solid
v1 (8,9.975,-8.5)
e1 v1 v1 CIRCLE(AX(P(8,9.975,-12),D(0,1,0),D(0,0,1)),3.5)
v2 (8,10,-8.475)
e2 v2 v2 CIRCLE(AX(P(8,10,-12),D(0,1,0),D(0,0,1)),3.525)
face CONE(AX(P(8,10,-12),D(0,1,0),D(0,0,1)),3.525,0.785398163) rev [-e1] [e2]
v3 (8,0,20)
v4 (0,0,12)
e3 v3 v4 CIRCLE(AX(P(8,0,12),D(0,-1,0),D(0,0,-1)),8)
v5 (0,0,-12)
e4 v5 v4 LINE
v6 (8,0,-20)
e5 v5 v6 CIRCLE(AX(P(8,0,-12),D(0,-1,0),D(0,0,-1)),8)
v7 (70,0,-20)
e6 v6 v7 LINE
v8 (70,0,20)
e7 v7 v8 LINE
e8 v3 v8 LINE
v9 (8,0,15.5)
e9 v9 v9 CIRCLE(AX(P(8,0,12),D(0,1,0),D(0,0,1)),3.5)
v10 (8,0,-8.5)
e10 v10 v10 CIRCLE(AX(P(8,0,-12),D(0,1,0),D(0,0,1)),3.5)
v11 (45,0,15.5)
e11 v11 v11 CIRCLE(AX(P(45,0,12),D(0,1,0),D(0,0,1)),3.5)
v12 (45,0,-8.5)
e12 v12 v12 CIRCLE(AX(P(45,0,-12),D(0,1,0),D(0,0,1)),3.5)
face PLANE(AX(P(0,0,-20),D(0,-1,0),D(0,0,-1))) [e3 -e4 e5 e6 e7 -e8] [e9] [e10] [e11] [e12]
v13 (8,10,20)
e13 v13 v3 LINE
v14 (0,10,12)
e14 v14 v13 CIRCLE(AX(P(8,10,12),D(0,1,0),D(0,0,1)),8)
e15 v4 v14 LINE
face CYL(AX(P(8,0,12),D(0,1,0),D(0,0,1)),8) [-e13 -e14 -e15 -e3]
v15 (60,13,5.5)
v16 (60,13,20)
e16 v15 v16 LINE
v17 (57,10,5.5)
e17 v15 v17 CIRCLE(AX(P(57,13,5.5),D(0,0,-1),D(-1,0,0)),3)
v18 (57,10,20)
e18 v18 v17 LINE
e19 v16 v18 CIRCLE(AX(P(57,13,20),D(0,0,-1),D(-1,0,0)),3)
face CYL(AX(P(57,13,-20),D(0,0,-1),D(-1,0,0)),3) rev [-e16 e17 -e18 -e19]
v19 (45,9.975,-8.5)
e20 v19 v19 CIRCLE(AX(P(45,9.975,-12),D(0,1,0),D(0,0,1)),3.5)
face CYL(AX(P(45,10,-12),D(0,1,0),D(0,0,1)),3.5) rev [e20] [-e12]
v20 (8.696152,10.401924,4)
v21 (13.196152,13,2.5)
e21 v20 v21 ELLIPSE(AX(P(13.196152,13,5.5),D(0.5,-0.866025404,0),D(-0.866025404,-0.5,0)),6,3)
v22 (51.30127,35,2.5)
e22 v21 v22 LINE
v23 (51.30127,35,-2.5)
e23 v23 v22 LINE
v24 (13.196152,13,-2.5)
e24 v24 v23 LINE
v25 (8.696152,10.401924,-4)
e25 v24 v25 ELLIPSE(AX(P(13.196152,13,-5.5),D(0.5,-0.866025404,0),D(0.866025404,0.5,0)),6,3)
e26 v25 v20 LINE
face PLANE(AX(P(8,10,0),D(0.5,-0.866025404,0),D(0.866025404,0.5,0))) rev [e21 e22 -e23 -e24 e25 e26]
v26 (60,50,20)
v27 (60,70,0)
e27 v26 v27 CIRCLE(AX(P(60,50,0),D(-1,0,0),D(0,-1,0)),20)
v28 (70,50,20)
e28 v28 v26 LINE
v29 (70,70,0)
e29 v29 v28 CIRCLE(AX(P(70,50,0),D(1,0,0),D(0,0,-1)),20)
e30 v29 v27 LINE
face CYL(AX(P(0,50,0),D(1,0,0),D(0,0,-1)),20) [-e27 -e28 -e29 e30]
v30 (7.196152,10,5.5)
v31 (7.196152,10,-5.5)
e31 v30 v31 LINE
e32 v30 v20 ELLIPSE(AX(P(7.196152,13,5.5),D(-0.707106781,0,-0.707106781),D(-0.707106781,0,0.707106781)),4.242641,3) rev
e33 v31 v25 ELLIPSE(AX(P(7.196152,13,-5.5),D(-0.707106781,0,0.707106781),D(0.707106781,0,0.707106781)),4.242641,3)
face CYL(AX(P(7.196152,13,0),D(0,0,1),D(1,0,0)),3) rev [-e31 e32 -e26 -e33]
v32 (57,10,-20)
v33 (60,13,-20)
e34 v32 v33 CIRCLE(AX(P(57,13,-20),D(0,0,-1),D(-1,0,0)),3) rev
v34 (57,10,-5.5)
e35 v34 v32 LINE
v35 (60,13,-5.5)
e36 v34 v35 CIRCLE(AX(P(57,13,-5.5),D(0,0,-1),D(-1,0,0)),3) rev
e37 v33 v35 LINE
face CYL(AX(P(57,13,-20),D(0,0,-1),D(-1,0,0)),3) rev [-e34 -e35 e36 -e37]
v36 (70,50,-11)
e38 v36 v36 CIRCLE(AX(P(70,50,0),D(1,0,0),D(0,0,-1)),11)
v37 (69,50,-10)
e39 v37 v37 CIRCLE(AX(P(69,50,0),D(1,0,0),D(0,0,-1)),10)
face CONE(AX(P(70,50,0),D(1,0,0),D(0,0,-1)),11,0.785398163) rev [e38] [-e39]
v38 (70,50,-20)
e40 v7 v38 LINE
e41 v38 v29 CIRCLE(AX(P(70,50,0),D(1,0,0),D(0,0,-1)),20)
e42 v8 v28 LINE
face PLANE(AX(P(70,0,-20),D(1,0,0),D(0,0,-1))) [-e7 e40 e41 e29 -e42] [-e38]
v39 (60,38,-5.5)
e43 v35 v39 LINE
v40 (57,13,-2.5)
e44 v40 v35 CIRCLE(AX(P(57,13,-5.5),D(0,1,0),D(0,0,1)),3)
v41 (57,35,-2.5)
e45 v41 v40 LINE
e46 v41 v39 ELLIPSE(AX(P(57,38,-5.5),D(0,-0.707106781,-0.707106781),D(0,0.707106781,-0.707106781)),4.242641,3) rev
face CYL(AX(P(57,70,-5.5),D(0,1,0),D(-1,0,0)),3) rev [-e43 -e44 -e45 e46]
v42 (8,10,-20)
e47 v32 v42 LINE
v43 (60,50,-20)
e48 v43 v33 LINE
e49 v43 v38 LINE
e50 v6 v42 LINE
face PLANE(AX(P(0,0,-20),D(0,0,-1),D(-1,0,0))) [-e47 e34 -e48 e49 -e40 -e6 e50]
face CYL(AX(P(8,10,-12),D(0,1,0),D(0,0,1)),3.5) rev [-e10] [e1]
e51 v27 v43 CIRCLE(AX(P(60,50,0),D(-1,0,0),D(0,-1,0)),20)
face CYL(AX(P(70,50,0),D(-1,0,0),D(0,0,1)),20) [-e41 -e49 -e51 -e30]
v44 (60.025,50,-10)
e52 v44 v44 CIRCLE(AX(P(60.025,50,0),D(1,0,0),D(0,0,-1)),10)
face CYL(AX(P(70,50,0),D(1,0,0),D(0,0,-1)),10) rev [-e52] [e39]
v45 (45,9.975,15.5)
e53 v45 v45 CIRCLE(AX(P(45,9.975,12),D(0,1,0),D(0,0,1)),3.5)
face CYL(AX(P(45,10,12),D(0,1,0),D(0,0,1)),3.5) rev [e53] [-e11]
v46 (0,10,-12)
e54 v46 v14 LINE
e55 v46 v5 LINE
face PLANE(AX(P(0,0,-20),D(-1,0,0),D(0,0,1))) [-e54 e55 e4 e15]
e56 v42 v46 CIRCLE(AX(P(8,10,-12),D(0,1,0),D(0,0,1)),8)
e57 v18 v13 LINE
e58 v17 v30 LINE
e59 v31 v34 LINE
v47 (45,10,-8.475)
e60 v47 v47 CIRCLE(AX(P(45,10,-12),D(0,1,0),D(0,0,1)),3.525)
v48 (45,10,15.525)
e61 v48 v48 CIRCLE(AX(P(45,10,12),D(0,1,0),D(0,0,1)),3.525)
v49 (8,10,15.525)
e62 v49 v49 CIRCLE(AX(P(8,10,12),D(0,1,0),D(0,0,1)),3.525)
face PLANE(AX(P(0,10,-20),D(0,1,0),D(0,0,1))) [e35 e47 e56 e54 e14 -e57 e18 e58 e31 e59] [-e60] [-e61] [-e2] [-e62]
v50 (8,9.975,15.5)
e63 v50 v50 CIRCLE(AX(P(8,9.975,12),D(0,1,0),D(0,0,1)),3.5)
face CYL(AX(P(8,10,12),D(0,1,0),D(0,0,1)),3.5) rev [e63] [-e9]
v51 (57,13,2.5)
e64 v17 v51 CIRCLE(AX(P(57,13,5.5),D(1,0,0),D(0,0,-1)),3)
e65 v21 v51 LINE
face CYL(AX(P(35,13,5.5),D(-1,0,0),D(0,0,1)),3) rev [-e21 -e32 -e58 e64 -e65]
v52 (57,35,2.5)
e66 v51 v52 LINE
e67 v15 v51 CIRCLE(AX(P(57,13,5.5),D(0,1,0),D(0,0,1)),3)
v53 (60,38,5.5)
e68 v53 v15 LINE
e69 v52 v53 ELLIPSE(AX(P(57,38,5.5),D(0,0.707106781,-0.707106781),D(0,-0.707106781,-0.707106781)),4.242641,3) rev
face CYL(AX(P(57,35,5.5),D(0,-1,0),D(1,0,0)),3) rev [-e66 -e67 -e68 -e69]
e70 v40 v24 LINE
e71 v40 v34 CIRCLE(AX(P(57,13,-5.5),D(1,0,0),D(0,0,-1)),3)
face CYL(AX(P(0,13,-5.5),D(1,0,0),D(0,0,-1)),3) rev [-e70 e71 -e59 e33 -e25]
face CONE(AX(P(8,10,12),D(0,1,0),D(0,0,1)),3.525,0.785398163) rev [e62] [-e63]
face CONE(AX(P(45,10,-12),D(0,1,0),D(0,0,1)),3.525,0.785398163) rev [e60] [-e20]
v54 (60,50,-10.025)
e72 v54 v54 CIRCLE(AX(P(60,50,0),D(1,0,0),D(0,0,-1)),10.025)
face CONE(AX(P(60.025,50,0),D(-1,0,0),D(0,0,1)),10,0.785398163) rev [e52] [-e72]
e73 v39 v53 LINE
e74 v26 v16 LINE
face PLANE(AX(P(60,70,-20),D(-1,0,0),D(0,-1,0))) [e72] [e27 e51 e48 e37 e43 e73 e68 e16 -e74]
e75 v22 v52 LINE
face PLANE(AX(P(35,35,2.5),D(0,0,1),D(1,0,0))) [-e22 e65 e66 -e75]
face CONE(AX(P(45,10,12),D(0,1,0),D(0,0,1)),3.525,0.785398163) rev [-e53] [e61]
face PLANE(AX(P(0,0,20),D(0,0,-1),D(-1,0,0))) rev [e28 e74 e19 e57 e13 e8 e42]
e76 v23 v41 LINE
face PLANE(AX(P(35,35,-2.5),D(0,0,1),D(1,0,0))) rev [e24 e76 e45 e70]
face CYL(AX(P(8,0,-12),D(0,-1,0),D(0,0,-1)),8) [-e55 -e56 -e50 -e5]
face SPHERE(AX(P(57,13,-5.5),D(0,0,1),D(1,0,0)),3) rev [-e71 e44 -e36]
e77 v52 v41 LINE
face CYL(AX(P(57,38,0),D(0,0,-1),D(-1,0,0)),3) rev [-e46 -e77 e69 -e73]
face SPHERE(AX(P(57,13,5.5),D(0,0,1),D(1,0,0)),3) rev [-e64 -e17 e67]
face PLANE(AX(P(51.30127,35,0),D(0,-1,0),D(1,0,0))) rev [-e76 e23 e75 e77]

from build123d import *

# Parameters (mm, degrees)
RESSALTO_EXTRUS_O1_DEPTH             = 20
FILETE1_R                            = 8
FILETE2_R                            = 20
FILETE3_R                            = 3
NERVURA23_START                      = -2.5
NERVURA23_DEPTH                      = 5
FILETE4_R                            = 3
FURO_DE_DI_METRO_7_0_7_1_D           = 7
FURO_DE_DI_METRO_7_0_7_1_CSINK_D     = 7.05
FURO_DE_DI_METRO_7_0_7_1_CSINK_ANGLE = 90


# Read off the part's stored shape, not the designer's step: Nervura23
with BuildPart() as part:
    # Esboço1 → Ressalto-extrusão1 (new, symmetric)
    with BuildSketch(Plane.XY):
        Polygon((0, 0), (70, 0), (70, 70), (60, 70), (60, 10), (0, 10), align=None)
    extrude(amount=RESSALTO_EXTRUS_O1_DEPTH, both=True)

    # Filete1
    filete1_edges = [part.edges().sort_by_distance(p)[0] for p in [
        (0, 5, -20),
        (0, 5, 20),
    ]]
    fillet(filete1_edges, radius=FILETE1_R)

    # Filete2
    filete2_edges = [part.edges().sort_by_distance(p)[0] for p in [
        (65, 70, 20),
        (65, 70, -20),
    ]]
    fillet(filete2_edges, radius=FILETE2_R - 0.0001)  # a hair under: the kernel refuses the full size

    # Filete3
    filete3_edges = [part.edges().sort_by_distance(p)[0] for p in [
        (60, 10, 0),
    ]]
    fillet(filete3_edges, radius=FILETE3_R)

    # Nervura23 outline → Nervura23 (add)
    with BuildSketch(Plane.XY.offset(NERVURA23_START)):
        with BuildLine():
            Line((60, 35), (51.301270189, 35))
            Line((51.301270189, 35), (8, 10))
            Line((8, 10), (57, 10))
            ThreePointArc((57, 10), (59.121320344, 10.878679656), (60, 13))
            Line((60, 13), (60, 35))
        make_face()
    extrude(amount=NERVURA23_DEPTH)

    # Filete4
    filete4_edges = [part.edges().sort_by_distance(p)[0] for p in [
        (59.121320344, 10.878679656, -2.5),
        (59.121320344, 10.878679656, 2.5),
        (8, 10, 0),
        (60, 35, 0),
        (32.5, 10, -2.5),
        (60, 24, -2.5),
        (32.5, 10, 2.5),
        (60, 24, 2.5),
    ]]
    fillet(filete4_edges, radius=FILETE4_R)

    # Furo de diâmetro Ø7.0 (7)1 (through all)
    with Locations(Plane(origin=(0, 10, 0), x_dir=(1, 0, 0), z_dir=(0, 1, 0))):
        with Locations((8, 12), (8, -12), (45, 12), (45, -12)):
            CounterSinkHole(FURO_DE_DI_METRO_7_0_7_1_D / 2, FURO_DE_DI_METRO_7_0_7_1_CSINK_D / 2, counter_sink_angle=FURO_DE_DI_METRO_7_0_7_1_CSINK_ANGLE)

    # Esboço11 → Furo de diâmetro Ø20.0 (20)1 (revolve, cut)
    with BuildSketch(Plane(origin=(70, 50, 0), x_dir=(0, 0, -1), z_dir=(0, 1, 0))):
        Polygon((0, 0), (0, 10), (10.025, 10), (10, 9.975), (10, 1), (11, 0), align=None)
    revolve(axis=Axis((76.35, 50, 0), (-1, 0, 0)), mode=Mode.SUBTRACT)


solid = part.part
